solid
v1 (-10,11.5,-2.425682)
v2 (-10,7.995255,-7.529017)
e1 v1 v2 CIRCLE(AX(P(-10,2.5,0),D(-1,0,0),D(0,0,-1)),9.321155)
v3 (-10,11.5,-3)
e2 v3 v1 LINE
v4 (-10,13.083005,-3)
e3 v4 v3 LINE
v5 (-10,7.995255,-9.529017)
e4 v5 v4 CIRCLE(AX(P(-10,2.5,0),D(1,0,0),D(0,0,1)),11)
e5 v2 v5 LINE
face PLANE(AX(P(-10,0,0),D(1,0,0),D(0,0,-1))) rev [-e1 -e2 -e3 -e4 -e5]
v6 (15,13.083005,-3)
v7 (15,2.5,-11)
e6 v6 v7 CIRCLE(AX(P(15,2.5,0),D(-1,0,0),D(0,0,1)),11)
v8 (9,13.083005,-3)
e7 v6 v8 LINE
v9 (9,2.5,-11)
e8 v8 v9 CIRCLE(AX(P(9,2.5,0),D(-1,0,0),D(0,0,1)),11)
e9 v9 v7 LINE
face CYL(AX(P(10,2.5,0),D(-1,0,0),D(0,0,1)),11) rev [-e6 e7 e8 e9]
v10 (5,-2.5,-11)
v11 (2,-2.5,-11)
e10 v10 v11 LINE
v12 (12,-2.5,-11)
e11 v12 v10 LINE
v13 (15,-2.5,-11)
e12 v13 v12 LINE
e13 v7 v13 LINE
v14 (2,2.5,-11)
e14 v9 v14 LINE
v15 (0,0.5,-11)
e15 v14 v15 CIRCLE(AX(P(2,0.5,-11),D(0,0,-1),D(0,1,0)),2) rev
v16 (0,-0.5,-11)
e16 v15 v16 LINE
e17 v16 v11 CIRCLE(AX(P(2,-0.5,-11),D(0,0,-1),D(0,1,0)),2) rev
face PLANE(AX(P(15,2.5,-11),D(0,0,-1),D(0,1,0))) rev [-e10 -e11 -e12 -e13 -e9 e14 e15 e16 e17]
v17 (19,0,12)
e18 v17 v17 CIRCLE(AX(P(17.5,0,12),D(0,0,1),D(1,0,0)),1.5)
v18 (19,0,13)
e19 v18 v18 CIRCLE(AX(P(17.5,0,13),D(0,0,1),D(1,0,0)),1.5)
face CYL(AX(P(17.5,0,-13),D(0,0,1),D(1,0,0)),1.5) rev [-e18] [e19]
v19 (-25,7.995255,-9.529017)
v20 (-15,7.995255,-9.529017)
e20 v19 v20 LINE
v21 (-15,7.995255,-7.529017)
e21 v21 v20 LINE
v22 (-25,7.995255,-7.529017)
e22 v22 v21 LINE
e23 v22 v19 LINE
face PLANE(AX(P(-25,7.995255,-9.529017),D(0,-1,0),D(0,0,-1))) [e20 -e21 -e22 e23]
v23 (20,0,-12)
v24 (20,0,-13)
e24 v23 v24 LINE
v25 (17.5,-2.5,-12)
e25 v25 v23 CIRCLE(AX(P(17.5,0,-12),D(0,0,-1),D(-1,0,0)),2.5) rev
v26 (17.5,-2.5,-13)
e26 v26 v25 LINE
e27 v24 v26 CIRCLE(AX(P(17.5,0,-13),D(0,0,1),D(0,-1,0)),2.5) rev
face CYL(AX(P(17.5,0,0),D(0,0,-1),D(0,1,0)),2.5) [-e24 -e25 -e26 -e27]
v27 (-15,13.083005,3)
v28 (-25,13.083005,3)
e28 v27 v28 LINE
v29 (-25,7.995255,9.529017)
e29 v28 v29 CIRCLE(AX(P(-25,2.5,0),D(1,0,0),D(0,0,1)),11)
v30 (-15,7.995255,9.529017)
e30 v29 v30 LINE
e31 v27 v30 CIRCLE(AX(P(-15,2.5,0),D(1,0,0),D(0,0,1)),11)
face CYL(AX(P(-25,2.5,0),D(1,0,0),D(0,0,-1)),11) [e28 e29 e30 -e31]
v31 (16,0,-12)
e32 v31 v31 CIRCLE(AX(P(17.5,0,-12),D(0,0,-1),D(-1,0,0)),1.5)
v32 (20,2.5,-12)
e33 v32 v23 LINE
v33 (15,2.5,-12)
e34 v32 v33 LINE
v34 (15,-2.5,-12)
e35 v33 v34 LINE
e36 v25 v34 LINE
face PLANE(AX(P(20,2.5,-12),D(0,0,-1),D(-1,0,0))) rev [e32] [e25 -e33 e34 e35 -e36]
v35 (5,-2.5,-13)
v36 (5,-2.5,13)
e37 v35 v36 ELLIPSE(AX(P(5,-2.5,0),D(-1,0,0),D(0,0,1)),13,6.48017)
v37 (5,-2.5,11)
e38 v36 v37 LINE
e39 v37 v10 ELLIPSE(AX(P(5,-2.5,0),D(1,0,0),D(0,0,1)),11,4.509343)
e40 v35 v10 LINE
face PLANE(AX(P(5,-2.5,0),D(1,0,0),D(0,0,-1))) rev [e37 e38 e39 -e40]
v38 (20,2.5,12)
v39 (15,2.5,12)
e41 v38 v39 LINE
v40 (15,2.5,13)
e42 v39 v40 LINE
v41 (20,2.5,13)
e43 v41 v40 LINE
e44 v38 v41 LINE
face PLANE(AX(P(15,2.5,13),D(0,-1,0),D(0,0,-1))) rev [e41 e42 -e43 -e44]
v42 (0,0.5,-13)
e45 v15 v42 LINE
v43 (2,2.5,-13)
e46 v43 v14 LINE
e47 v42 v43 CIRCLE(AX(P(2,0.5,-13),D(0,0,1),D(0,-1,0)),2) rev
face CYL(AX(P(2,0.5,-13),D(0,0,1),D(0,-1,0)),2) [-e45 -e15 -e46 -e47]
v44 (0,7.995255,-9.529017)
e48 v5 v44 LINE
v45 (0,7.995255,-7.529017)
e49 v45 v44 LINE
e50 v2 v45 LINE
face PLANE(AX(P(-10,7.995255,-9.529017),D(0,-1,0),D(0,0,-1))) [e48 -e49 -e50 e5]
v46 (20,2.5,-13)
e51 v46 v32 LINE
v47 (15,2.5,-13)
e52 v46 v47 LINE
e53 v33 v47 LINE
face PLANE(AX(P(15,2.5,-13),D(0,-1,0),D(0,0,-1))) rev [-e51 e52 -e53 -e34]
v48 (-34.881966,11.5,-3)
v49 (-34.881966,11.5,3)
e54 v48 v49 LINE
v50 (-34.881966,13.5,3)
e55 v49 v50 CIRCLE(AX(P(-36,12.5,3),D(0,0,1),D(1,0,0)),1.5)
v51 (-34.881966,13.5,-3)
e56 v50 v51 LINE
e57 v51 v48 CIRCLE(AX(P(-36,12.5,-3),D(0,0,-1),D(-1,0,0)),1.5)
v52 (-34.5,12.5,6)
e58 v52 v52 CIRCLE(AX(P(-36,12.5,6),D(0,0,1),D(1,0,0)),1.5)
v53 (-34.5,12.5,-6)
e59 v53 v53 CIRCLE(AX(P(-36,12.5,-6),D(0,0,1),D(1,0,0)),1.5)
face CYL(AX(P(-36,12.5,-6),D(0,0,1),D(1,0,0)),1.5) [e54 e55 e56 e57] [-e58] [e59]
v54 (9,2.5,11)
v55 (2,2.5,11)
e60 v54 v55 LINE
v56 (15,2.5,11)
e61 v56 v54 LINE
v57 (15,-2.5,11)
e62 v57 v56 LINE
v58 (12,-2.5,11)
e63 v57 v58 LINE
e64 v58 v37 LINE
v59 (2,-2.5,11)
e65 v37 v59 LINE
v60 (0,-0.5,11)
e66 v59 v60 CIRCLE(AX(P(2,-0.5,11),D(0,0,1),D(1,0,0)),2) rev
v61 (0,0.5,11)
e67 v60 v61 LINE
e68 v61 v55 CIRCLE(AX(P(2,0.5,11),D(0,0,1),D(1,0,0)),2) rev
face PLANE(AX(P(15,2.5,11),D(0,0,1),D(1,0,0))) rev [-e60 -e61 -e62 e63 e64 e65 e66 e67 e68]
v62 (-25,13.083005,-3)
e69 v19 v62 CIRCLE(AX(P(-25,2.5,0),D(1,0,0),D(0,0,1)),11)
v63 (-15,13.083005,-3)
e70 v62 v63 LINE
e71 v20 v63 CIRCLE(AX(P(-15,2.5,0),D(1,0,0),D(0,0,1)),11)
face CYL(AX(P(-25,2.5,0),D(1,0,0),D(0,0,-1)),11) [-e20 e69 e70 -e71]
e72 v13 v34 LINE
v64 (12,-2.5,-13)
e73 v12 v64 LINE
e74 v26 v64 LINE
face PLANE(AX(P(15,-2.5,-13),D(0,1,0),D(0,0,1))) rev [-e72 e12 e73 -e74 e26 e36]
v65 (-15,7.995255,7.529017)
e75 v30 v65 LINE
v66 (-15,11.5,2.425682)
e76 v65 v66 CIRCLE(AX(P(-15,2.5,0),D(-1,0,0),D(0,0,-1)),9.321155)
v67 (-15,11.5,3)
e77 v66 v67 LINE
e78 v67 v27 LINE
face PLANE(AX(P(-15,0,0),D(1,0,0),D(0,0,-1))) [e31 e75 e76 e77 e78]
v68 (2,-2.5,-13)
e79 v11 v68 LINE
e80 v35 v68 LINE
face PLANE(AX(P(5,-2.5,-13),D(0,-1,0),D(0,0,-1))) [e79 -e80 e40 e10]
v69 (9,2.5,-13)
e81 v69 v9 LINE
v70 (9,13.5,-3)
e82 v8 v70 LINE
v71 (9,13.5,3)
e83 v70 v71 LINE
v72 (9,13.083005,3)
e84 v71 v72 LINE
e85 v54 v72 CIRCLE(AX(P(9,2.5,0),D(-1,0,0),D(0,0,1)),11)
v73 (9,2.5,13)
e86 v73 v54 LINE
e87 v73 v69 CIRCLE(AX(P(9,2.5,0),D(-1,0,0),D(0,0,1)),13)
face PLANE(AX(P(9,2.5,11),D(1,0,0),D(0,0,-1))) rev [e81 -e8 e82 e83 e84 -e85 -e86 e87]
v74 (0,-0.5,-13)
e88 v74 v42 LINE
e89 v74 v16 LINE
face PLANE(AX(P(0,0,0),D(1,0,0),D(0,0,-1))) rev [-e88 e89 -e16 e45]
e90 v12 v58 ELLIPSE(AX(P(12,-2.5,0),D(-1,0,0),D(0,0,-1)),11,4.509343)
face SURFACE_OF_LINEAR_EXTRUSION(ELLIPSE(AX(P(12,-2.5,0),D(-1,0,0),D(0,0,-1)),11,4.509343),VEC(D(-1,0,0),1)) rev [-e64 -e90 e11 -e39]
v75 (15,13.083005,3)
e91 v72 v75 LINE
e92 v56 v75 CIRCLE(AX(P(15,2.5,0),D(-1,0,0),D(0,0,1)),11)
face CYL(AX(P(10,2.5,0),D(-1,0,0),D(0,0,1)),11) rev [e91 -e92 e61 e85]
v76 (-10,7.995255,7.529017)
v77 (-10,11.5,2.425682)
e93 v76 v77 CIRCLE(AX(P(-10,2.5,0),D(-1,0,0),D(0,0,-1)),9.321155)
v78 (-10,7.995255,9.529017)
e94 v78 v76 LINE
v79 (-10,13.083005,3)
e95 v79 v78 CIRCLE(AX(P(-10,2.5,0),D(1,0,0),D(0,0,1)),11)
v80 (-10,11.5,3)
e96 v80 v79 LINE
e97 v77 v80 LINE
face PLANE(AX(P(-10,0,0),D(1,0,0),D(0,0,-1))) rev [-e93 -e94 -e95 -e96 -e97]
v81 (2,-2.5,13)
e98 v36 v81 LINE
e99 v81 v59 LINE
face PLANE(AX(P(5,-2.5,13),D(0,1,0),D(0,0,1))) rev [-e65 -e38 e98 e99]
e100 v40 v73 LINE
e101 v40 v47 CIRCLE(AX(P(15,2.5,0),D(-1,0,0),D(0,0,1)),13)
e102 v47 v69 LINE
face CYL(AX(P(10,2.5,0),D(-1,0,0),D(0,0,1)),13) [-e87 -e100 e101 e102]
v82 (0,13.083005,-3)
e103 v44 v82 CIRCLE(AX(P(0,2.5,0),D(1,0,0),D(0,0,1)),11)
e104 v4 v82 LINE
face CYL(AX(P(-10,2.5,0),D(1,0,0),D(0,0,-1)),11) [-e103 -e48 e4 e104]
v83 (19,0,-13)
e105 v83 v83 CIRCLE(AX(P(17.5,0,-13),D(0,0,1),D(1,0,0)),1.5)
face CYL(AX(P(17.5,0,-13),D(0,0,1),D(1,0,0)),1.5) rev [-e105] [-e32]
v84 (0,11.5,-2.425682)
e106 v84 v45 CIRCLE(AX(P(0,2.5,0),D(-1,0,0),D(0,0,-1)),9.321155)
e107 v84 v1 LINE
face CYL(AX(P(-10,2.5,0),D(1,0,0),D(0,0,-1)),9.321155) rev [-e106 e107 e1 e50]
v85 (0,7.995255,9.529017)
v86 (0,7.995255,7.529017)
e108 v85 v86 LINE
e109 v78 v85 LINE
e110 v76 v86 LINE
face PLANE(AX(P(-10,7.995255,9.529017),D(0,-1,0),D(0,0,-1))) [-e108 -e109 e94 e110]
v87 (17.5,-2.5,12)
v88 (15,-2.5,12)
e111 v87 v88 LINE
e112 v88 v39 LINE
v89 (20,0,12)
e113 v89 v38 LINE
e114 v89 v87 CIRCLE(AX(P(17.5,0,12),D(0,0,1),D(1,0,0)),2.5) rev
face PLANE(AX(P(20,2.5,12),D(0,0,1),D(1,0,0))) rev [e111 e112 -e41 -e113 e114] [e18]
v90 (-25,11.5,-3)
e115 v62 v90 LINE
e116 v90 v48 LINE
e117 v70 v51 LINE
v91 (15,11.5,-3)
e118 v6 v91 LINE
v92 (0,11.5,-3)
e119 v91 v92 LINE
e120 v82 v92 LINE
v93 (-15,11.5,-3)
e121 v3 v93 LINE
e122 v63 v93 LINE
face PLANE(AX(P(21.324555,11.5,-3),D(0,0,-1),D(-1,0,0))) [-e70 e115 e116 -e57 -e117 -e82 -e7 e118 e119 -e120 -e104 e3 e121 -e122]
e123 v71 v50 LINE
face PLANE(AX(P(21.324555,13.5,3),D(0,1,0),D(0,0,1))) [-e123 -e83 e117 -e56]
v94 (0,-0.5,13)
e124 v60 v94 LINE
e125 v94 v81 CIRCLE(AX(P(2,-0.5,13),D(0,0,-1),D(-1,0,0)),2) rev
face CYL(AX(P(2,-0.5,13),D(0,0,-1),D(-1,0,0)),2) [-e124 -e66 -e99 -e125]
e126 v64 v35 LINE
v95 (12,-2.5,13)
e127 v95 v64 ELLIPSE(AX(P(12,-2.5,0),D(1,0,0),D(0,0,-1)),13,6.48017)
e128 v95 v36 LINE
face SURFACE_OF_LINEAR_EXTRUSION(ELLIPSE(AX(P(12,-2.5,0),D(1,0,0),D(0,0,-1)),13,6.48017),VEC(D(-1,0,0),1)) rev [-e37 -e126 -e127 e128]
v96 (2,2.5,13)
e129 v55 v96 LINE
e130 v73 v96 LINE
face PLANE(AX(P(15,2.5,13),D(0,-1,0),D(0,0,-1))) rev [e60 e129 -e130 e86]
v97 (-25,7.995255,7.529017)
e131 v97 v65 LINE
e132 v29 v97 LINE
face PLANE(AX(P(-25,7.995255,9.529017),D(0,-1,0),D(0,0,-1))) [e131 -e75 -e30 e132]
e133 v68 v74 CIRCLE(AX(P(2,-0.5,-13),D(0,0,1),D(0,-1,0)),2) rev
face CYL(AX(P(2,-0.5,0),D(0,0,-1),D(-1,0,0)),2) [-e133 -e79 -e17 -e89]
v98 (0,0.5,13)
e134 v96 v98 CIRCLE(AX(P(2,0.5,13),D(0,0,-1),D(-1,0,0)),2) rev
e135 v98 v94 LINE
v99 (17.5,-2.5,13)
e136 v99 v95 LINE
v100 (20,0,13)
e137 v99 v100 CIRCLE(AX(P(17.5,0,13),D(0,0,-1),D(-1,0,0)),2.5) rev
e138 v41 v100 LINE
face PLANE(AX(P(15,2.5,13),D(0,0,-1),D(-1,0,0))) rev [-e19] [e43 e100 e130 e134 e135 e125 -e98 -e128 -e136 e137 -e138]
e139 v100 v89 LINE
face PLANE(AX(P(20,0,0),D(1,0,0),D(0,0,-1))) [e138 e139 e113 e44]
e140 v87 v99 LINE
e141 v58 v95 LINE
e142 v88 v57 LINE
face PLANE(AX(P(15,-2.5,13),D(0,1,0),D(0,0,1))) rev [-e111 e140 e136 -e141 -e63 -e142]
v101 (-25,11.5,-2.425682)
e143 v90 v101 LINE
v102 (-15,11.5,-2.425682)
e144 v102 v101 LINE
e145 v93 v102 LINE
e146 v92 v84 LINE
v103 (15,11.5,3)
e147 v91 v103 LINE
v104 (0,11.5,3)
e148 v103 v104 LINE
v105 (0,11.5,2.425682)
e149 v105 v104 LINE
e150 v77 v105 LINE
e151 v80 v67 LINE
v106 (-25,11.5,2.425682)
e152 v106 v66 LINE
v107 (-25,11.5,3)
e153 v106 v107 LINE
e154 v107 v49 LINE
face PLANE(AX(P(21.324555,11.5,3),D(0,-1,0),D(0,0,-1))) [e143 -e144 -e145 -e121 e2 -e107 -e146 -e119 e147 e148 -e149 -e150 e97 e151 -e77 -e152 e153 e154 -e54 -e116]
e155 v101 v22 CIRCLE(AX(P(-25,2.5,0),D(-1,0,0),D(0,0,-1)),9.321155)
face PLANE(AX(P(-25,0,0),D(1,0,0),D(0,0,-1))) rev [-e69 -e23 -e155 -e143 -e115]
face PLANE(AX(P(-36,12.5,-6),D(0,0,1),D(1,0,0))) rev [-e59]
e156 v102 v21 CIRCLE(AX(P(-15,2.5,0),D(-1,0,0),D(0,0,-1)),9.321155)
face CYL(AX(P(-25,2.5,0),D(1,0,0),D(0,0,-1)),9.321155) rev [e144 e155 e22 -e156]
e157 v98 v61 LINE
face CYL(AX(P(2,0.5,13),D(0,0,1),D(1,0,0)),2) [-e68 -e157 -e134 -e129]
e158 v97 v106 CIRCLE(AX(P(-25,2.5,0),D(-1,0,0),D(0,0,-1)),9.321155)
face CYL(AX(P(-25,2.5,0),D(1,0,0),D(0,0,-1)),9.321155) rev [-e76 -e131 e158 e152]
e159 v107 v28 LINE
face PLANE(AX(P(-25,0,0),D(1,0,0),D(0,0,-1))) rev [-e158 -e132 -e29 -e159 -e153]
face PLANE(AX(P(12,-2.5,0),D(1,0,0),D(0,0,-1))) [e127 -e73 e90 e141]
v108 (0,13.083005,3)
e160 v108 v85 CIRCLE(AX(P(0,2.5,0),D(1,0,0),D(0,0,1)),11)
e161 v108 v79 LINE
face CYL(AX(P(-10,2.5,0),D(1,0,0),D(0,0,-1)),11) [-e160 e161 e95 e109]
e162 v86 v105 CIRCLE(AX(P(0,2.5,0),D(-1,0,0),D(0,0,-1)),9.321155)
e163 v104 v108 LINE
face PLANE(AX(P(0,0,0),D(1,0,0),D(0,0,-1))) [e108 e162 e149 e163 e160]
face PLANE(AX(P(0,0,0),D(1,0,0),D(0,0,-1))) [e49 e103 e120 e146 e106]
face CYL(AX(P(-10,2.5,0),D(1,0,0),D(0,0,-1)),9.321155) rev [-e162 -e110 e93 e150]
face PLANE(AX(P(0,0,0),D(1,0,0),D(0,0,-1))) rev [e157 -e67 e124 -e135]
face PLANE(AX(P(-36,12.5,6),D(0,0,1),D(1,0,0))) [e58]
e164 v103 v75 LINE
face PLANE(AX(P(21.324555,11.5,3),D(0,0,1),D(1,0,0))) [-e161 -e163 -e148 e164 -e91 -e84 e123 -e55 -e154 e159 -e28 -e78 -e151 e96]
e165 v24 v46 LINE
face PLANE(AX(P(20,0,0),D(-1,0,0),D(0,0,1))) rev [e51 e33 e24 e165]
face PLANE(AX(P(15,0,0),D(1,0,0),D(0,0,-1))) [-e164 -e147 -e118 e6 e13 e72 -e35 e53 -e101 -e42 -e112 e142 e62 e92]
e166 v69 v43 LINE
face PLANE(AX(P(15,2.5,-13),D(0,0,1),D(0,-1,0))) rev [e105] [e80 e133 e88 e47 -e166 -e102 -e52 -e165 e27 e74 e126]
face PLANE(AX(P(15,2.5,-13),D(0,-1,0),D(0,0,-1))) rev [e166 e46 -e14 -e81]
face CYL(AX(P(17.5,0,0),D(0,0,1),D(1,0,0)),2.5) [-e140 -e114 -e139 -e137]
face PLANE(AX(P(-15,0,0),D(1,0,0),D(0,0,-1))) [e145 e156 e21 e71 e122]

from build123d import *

# Parameters (mm, degrees)
SKETCH1_W                = 2
SKETCH1_H                = 5
BOSS_EXTRUDE1_DEPTH      = 15
BOSS_EXTRUDE1_2_DEPTH    = 15
SKETCH2_W                = 1
SKETCH2_H                = 5
BOSS_EXTRUDE2_DEPTH      = 5
CUT_EXTRUDE1_DEPTH       = 33.113081447
CUT_EXTRUDE1_DEPTH_BACK  = 33.113081447
SKETCH3_R                = 1.5
SWEEP1_START             = 9
SWEEP1_DEPTH             = 6
BOSS_EXTRUDE3_DEPTH      = 12
CUT_EXTRUDE2_DEPTH       = 5
FILLET1_R                = 2
BOSS_EXTRUDE6_START      = -6
SKETCH7_W                = 6
SKETCH7_H                = 2
BOSS_EXTRUDE6_DEPTH      = 51
BOSS_EXTRUDE7_DEPTH      = 3
BOSS_EXTRUDE7_DEPTH_BACK = 9
SKETCH8_R                = 1.5
FILLET2_R                = 2.5
BOSS_EXTRUDE10_DEPTH     = 10
LPATTERN1_COUNT          = 2
LPATTERN1_PITCH          = 15


# Read off the part's stored shape, not the designer's step: Sweep1
with BuildPart() as part:
    # Sketch1 → Boss-Extrude1 (new body)
    with BuildSketch(Plane(origin=(0, 0, 0), x_dir=(0, 0, -1), z_dir=(1, 0, 0))):
        with Locations((-12, 0)):
            Rectangle(SKETCH1_W, SKETCH1_H)
    extrude(amount=BOSS_EXTRUDE1_DEPTH)



with BuildPart() as body_2:
    # Sketch1 → Boss-Extrude1 2 (new body)
    with BuildSketch(Plane(origin=(0, 0, 0), x_dir=(0, 0, -1), z_dir=(1, 0, 0))):
        with Locations((12, 0)):
            Rectangle(SKETCH1_W, SKETCH1_H)
    extrude(amount=BOSS_EXTRUDE1_2_DEPTH)


with BuildPart() as part_1:
    add(part.part)

    add(body_2.part)  # Boss-Extrude2 merges body 2
    # Sketch2 → Boss-Extrude2 (add)
    with BuildSketch(Plane(origin=(15, 0, 0), x_dir=(0, 0, -1), z_dir=(1, 0, 0))):
        with Locations((12.5, 0)):
            Rectangle(SKETCH2_W, SKETCH2_H)
        with Locations((-12.5, 0)):
            Rectangle(SKETCH2_W, SKETCH2_H)
    extrude(amount=BOSS_EXTRUDE2_DEPTH)

    # Sketch3 → Cut-Extrude1 (cut, two sides: drawn at the far end of the back side and taken through both)
    with BuildSketch(Plane.XY.offset(-12).offset(-CUT_EXTRUDE1_DEPTH_BACK)):
        with Locations((17.5, 0)):
            Circle(SKETCH3_R)
    extrude(amount=CUT_EXTRUDE1_DEPTH + CUT_EXTRUDE1_DEPTH_BACK, mode=Mode.SUBTRACT)

    # Sweep1 outline → Sweep1 (add)
    with BuildSketch(Plane.YZ.offset(SWEEP1_START)):
        with BuildLine():
            ThreePointArc((2.5, -13), (15.5, 0), (2.5, 13))
            Line((2.5, 13), (2.5, 11))
            ThreePointArc((2.5, 11), (13.5, 0), (2.5, -11))
            Line((2.5, -11), (2.5, -13))
        make_face()
    extrude(amount=SWEEP1_DEPTH)

    # Sketch5 → Boss-Extrude3 (add)
    with BuildSketch(Plane(origin=(0, 0, 0), x_dir=(0, 0, -1), z_dir=(1, 0, 0))):
        with BuildLine():
            Line((-11, -2.5), (-13, -2.5))
            add(Edge.make_bspline(
                [(-13, -2.5), (-13, -8.980170496), (0, -8.980170496)],
                knots=[3.141592654, 3.141592654, 3.141592654, 4.71238898, 4.71238898, 4.71238898], degree=2, weights=[1, 0.707106781, 1]))
            Line((0, -8.980170496), (0, -7.009343108))
            add(Edge.make_bspline(
                [(-11, -2.5), (-11, -7.009343108), (0, -7.009343108)],
                knots=[3.141592654, 3.141592654, 3.141592654, 4.71238898, 4.71238898, 4.71238898], degree=2, weights=[1, 0.707106781, 1]))
        make_face()
    boss_extrude3 = extrude(amount=BOSS_EXTRUDE3_DEPTH)

    # Sketch6 → Cut-Extrude2 (cut)
    with BuildSketch(Plane.ZY):
        with BuildLine():
            Line((13, -2.5), (11, -2.5))
            add(Edge.make_bspline(
                [(0, -7.009343108), (11, -7.009343108), (11, -2.5)],
                knots=[4.71238898, 4.71238898, 4.71238898, 6.283185307, 6.283185307, 6.283185307], degree=2, weights=[1, 0.707106781, 1]))
            Line((0, -7.009343108), (0, -8.980170496))
            add(Edge.make_bspline(
                [(0, -8.980170496), (13, -8.980170496), (13, -2.5)],
                knots=[4.71238898, 4.71238898, 4.71238898, 6.283185307, 6.283185307, 6.283185307], degree=2, weights=[1, 0.707106781, 1]))
        make_face()
    cut_extrude2 = extrude(amount=-CUT_EXTRUDE2_DEPTH, mode=Mode.SUBTRACT)

    # Mirror2: Boss-Extrude3, Cut-Extrude2 across plane
    add(boss_extrude3.mirror(Plane(origin=(12, -8.980170496, 0), x_dir=(1, 0, 0), z_dir=(0, 0, 1))))
    add(cut_extrude2.mirror(Plane(origin=(12, -8.980170496, 0), x_dir=(1, 0, 0), z_dir=(0, 0, 1))), mode=Mode.SUBTRACT)

    # Fillet1
    fillet1_edges = [part_1.edges().sort_by_distance(p)[0] for p in [
        (0, -2.5, -12),
        (0, 2.5, -12),
        (0, 2.5, 12),
        (0, -2.5, 12),
    ]]
    fillet(fillet1_edges, radius=FILLET1_R)

    # Sketch7 → Boss-Extrude6 (add)
    with BuildSketch(Plane.ZY.offset(-9).offset(BOSS_EXTRUDE6_START)):
        with Locations((0, 12.5)):
            Rectangle(SKETCH7_W, SKETCH7_H)
    extrude(amount=BOSS_EXTRUDE6_DEPTH)

    # Sketch8 → Boss-Extrude7 (add, two sides: drawn at the far end of the back side and taken through both)
    with BuildSketch(Plane.XY.offset(3).offset(-BOSS_EXTRUDE7_DEPTH_BACK)):
        with Locations((-36, 12.5)):
            Circle(SKETCH8_R)
    extrude(amount=BOSS_EXTRUDE7_DEPTH + BOSS_EXTRUDE7_DEPTH_BACK)

    # Fillet2
    fillet2_edges = [part_1.edges().sort_by_distance(p)[0] for p in [
        (20, -2.5, -12.5),
        (20, -2.5, 12.5),
    ]]
    fillet(fillet2_edges, radius=FILLET2_R)

    # 3DSketch3 → Boss-Extrude10 (add)
    with BuildSketch(Plane(origin=(-10, 7.995255445, 9.529017137), x_dir=(0, 0, -1), z_dir=(1, 0, 0))):
        with BuildLine():
            Line((0, 0), (2, 0))
            ThreePointArc((2, 0), (9.529017137, 3.825899604), (17.058034273, 0))
            Line((17.058034273, 0), (19.058034273, 0))
            ThreePointArc((19.058034273, 0), (15.031388903, 4.029654263), (9.529017137, 5.504744555))
            ThreePointArc((9.529017137, 5.504744555), (4.026645371, 4.029654263), (0, 0))
        make_face()
    boss_extrude10 = extrude(amount=BOSS_EXTRUDE10_DEPTH)

    # LPattern1: Boss-Extrude10 ×2
    with Locations(*[(-i * LPATTERN1_PITCH, 0, 0) for i in range(1, LPATTERN1_COUNT)]):
        add(boss_extrude10)


solid = part_1.part
